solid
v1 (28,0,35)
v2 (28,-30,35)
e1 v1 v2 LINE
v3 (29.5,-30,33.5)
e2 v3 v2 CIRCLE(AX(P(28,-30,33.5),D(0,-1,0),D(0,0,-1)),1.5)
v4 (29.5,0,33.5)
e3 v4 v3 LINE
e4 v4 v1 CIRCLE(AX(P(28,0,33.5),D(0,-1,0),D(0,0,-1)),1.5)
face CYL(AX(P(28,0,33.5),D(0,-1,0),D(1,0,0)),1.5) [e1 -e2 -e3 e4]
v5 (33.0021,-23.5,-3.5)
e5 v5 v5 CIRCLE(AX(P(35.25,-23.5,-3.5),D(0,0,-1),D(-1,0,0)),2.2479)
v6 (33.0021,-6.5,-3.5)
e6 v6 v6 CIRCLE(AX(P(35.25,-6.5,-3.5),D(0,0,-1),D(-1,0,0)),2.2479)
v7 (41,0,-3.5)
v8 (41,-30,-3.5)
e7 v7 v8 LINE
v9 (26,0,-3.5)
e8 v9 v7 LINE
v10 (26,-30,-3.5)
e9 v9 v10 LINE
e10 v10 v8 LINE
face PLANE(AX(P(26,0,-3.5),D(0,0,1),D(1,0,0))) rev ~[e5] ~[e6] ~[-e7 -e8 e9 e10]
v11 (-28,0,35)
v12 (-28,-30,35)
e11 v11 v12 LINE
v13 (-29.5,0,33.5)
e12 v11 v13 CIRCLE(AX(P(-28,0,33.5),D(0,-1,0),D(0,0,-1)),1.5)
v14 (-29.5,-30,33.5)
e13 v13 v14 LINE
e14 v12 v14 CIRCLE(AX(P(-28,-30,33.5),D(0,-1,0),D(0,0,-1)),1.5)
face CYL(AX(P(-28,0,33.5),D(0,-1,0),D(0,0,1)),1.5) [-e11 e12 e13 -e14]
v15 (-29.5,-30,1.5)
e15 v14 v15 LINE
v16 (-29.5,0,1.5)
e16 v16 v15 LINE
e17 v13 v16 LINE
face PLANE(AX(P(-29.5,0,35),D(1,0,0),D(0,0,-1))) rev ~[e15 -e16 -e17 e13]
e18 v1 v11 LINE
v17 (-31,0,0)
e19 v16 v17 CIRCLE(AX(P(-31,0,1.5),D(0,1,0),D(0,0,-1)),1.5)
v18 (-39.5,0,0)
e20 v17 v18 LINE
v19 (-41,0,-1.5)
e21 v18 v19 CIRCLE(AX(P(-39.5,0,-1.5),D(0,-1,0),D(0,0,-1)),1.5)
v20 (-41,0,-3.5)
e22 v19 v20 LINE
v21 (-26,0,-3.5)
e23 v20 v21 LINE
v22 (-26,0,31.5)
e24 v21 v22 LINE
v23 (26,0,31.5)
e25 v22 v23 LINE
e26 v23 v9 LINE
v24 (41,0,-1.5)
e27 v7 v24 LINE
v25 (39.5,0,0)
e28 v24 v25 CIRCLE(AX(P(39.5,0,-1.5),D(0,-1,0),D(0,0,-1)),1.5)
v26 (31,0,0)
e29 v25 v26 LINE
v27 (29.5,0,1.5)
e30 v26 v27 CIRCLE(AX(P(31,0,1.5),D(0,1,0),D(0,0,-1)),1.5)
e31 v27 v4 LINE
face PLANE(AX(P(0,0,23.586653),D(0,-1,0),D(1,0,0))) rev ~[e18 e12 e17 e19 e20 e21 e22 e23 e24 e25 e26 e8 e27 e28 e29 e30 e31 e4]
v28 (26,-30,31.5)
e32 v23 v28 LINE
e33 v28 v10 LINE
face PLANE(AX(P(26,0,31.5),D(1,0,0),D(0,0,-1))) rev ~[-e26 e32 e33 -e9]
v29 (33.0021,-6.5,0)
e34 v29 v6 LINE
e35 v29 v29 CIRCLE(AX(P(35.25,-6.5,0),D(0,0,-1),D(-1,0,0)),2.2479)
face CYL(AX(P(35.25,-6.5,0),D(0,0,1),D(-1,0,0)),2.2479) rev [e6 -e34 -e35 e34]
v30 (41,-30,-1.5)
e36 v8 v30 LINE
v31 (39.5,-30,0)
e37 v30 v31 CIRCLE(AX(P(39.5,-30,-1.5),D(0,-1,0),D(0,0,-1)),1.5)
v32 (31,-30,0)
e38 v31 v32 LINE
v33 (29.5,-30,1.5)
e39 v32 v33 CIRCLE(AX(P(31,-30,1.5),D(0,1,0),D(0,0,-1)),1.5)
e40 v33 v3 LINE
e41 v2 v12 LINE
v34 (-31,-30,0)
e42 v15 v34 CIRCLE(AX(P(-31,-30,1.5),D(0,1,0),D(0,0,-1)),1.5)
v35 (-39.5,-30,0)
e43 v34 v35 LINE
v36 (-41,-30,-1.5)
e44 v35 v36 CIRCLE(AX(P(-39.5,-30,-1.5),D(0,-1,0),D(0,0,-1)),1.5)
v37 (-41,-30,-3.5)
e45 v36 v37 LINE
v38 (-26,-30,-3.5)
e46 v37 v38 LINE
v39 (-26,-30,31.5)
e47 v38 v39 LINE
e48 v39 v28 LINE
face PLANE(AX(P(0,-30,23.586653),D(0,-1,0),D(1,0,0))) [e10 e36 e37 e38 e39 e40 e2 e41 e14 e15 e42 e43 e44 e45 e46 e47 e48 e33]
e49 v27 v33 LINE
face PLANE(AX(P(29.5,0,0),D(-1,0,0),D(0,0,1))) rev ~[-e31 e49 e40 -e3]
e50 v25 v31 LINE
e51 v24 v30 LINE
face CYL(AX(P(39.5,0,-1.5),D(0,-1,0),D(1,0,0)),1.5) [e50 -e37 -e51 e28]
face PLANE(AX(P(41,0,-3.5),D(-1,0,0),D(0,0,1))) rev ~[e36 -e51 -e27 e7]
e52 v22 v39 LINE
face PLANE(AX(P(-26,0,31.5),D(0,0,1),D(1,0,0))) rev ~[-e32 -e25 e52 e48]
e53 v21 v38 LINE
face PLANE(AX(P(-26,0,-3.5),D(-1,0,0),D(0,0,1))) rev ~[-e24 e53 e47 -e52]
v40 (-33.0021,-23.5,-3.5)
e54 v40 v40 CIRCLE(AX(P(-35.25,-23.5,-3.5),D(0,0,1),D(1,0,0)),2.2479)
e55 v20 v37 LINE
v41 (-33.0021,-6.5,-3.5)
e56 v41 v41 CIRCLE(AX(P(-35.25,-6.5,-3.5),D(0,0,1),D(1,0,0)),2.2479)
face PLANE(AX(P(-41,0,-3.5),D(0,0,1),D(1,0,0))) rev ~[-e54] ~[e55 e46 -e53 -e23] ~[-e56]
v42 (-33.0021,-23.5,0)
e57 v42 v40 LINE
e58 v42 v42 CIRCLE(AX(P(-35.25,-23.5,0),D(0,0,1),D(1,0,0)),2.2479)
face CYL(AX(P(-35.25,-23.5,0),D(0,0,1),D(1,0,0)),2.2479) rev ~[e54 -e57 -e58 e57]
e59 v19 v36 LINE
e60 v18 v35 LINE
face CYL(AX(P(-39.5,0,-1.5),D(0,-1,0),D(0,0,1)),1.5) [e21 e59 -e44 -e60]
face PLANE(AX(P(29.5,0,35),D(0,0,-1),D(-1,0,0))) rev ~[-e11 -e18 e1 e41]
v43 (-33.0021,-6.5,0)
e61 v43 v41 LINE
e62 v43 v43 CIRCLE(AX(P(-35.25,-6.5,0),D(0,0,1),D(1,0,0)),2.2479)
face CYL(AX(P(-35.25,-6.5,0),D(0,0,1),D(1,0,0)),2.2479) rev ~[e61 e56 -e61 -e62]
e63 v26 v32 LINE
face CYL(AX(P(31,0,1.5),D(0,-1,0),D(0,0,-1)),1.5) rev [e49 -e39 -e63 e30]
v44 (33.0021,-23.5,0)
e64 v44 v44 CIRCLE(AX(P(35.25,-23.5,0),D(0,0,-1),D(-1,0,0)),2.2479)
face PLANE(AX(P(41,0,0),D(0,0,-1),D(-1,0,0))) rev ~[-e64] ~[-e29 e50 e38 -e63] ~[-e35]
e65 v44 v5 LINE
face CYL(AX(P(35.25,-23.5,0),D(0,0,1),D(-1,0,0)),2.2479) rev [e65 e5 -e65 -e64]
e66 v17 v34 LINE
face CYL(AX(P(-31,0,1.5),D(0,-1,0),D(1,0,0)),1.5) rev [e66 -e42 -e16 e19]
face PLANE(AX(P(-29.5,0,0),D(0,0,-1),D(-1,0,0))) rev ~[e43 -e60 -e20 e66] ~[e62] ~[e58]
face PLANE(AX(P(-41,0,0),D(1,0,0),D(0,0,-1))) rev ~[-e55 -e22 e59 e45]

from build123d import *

# Parameters (mm, degrees)
F1_DEPTH = 30
F2_R     = 2.2479
F3_DEPTH = 3.5
F4_R     = 1.5


# Not quite as in the source:
# - a pattern or mirror of a feature is missing from the dataset's text; its kind, count and spacing are read off the source's solid


with BuildPart() as f1:
    # F0 (on Front) → F1 (new body)
    with BuildSketch(Plane.XZ):
        Polygon((-26, 0), (-26, 31.5), (26, 31.5), (26, 0), (29.5, 0), (29.5, 35), (-29.5, 35), (-29.5, 0), align=None)
        Polygon((-26, -3.5), (-26, 0), (-29.5, 0), (-41, 0), (-41, -3.5), align=None)
        Polygon((29.5, 0), (26, 0), (26, -3.5), (41, -3.5), (41, 0), align=None)
    extrude(amount=F1_DEPTH)

    # F2 (on face) → F3 (cut, through all)
    with BuildSketch(Plane.XY):
        with Locations((-35.25, -23.5)):
            Circle(F2_R)
        with Locations((-35.25, -6.5)):
            Circle(F2_R)
    f3 = extrude(amount=-F3_DEPTH, mode=Mode.SUBTRACT)

    # F3_copies: F3 across plane
    add(f3.mirror(Plane(origin=(0, 0, 0), x_dir=(0, 0, 1), z_dir=(1, 0, 0))), mode=Mode.SUBTRACT)

    # F4
    f4_edges = [f1.edges().sort_by_distance(p)[0] for p in [
        (-29.5, -15, 35),
        (-29.5, -15, 0),
        (-41, -15, 0),
        (29.5, -15, 35),
        (29.5, -15, 0),
        (41, -15, 0),
    ]]
    fillet(f4_edges, radius=F4_R)


solid = f1.part
